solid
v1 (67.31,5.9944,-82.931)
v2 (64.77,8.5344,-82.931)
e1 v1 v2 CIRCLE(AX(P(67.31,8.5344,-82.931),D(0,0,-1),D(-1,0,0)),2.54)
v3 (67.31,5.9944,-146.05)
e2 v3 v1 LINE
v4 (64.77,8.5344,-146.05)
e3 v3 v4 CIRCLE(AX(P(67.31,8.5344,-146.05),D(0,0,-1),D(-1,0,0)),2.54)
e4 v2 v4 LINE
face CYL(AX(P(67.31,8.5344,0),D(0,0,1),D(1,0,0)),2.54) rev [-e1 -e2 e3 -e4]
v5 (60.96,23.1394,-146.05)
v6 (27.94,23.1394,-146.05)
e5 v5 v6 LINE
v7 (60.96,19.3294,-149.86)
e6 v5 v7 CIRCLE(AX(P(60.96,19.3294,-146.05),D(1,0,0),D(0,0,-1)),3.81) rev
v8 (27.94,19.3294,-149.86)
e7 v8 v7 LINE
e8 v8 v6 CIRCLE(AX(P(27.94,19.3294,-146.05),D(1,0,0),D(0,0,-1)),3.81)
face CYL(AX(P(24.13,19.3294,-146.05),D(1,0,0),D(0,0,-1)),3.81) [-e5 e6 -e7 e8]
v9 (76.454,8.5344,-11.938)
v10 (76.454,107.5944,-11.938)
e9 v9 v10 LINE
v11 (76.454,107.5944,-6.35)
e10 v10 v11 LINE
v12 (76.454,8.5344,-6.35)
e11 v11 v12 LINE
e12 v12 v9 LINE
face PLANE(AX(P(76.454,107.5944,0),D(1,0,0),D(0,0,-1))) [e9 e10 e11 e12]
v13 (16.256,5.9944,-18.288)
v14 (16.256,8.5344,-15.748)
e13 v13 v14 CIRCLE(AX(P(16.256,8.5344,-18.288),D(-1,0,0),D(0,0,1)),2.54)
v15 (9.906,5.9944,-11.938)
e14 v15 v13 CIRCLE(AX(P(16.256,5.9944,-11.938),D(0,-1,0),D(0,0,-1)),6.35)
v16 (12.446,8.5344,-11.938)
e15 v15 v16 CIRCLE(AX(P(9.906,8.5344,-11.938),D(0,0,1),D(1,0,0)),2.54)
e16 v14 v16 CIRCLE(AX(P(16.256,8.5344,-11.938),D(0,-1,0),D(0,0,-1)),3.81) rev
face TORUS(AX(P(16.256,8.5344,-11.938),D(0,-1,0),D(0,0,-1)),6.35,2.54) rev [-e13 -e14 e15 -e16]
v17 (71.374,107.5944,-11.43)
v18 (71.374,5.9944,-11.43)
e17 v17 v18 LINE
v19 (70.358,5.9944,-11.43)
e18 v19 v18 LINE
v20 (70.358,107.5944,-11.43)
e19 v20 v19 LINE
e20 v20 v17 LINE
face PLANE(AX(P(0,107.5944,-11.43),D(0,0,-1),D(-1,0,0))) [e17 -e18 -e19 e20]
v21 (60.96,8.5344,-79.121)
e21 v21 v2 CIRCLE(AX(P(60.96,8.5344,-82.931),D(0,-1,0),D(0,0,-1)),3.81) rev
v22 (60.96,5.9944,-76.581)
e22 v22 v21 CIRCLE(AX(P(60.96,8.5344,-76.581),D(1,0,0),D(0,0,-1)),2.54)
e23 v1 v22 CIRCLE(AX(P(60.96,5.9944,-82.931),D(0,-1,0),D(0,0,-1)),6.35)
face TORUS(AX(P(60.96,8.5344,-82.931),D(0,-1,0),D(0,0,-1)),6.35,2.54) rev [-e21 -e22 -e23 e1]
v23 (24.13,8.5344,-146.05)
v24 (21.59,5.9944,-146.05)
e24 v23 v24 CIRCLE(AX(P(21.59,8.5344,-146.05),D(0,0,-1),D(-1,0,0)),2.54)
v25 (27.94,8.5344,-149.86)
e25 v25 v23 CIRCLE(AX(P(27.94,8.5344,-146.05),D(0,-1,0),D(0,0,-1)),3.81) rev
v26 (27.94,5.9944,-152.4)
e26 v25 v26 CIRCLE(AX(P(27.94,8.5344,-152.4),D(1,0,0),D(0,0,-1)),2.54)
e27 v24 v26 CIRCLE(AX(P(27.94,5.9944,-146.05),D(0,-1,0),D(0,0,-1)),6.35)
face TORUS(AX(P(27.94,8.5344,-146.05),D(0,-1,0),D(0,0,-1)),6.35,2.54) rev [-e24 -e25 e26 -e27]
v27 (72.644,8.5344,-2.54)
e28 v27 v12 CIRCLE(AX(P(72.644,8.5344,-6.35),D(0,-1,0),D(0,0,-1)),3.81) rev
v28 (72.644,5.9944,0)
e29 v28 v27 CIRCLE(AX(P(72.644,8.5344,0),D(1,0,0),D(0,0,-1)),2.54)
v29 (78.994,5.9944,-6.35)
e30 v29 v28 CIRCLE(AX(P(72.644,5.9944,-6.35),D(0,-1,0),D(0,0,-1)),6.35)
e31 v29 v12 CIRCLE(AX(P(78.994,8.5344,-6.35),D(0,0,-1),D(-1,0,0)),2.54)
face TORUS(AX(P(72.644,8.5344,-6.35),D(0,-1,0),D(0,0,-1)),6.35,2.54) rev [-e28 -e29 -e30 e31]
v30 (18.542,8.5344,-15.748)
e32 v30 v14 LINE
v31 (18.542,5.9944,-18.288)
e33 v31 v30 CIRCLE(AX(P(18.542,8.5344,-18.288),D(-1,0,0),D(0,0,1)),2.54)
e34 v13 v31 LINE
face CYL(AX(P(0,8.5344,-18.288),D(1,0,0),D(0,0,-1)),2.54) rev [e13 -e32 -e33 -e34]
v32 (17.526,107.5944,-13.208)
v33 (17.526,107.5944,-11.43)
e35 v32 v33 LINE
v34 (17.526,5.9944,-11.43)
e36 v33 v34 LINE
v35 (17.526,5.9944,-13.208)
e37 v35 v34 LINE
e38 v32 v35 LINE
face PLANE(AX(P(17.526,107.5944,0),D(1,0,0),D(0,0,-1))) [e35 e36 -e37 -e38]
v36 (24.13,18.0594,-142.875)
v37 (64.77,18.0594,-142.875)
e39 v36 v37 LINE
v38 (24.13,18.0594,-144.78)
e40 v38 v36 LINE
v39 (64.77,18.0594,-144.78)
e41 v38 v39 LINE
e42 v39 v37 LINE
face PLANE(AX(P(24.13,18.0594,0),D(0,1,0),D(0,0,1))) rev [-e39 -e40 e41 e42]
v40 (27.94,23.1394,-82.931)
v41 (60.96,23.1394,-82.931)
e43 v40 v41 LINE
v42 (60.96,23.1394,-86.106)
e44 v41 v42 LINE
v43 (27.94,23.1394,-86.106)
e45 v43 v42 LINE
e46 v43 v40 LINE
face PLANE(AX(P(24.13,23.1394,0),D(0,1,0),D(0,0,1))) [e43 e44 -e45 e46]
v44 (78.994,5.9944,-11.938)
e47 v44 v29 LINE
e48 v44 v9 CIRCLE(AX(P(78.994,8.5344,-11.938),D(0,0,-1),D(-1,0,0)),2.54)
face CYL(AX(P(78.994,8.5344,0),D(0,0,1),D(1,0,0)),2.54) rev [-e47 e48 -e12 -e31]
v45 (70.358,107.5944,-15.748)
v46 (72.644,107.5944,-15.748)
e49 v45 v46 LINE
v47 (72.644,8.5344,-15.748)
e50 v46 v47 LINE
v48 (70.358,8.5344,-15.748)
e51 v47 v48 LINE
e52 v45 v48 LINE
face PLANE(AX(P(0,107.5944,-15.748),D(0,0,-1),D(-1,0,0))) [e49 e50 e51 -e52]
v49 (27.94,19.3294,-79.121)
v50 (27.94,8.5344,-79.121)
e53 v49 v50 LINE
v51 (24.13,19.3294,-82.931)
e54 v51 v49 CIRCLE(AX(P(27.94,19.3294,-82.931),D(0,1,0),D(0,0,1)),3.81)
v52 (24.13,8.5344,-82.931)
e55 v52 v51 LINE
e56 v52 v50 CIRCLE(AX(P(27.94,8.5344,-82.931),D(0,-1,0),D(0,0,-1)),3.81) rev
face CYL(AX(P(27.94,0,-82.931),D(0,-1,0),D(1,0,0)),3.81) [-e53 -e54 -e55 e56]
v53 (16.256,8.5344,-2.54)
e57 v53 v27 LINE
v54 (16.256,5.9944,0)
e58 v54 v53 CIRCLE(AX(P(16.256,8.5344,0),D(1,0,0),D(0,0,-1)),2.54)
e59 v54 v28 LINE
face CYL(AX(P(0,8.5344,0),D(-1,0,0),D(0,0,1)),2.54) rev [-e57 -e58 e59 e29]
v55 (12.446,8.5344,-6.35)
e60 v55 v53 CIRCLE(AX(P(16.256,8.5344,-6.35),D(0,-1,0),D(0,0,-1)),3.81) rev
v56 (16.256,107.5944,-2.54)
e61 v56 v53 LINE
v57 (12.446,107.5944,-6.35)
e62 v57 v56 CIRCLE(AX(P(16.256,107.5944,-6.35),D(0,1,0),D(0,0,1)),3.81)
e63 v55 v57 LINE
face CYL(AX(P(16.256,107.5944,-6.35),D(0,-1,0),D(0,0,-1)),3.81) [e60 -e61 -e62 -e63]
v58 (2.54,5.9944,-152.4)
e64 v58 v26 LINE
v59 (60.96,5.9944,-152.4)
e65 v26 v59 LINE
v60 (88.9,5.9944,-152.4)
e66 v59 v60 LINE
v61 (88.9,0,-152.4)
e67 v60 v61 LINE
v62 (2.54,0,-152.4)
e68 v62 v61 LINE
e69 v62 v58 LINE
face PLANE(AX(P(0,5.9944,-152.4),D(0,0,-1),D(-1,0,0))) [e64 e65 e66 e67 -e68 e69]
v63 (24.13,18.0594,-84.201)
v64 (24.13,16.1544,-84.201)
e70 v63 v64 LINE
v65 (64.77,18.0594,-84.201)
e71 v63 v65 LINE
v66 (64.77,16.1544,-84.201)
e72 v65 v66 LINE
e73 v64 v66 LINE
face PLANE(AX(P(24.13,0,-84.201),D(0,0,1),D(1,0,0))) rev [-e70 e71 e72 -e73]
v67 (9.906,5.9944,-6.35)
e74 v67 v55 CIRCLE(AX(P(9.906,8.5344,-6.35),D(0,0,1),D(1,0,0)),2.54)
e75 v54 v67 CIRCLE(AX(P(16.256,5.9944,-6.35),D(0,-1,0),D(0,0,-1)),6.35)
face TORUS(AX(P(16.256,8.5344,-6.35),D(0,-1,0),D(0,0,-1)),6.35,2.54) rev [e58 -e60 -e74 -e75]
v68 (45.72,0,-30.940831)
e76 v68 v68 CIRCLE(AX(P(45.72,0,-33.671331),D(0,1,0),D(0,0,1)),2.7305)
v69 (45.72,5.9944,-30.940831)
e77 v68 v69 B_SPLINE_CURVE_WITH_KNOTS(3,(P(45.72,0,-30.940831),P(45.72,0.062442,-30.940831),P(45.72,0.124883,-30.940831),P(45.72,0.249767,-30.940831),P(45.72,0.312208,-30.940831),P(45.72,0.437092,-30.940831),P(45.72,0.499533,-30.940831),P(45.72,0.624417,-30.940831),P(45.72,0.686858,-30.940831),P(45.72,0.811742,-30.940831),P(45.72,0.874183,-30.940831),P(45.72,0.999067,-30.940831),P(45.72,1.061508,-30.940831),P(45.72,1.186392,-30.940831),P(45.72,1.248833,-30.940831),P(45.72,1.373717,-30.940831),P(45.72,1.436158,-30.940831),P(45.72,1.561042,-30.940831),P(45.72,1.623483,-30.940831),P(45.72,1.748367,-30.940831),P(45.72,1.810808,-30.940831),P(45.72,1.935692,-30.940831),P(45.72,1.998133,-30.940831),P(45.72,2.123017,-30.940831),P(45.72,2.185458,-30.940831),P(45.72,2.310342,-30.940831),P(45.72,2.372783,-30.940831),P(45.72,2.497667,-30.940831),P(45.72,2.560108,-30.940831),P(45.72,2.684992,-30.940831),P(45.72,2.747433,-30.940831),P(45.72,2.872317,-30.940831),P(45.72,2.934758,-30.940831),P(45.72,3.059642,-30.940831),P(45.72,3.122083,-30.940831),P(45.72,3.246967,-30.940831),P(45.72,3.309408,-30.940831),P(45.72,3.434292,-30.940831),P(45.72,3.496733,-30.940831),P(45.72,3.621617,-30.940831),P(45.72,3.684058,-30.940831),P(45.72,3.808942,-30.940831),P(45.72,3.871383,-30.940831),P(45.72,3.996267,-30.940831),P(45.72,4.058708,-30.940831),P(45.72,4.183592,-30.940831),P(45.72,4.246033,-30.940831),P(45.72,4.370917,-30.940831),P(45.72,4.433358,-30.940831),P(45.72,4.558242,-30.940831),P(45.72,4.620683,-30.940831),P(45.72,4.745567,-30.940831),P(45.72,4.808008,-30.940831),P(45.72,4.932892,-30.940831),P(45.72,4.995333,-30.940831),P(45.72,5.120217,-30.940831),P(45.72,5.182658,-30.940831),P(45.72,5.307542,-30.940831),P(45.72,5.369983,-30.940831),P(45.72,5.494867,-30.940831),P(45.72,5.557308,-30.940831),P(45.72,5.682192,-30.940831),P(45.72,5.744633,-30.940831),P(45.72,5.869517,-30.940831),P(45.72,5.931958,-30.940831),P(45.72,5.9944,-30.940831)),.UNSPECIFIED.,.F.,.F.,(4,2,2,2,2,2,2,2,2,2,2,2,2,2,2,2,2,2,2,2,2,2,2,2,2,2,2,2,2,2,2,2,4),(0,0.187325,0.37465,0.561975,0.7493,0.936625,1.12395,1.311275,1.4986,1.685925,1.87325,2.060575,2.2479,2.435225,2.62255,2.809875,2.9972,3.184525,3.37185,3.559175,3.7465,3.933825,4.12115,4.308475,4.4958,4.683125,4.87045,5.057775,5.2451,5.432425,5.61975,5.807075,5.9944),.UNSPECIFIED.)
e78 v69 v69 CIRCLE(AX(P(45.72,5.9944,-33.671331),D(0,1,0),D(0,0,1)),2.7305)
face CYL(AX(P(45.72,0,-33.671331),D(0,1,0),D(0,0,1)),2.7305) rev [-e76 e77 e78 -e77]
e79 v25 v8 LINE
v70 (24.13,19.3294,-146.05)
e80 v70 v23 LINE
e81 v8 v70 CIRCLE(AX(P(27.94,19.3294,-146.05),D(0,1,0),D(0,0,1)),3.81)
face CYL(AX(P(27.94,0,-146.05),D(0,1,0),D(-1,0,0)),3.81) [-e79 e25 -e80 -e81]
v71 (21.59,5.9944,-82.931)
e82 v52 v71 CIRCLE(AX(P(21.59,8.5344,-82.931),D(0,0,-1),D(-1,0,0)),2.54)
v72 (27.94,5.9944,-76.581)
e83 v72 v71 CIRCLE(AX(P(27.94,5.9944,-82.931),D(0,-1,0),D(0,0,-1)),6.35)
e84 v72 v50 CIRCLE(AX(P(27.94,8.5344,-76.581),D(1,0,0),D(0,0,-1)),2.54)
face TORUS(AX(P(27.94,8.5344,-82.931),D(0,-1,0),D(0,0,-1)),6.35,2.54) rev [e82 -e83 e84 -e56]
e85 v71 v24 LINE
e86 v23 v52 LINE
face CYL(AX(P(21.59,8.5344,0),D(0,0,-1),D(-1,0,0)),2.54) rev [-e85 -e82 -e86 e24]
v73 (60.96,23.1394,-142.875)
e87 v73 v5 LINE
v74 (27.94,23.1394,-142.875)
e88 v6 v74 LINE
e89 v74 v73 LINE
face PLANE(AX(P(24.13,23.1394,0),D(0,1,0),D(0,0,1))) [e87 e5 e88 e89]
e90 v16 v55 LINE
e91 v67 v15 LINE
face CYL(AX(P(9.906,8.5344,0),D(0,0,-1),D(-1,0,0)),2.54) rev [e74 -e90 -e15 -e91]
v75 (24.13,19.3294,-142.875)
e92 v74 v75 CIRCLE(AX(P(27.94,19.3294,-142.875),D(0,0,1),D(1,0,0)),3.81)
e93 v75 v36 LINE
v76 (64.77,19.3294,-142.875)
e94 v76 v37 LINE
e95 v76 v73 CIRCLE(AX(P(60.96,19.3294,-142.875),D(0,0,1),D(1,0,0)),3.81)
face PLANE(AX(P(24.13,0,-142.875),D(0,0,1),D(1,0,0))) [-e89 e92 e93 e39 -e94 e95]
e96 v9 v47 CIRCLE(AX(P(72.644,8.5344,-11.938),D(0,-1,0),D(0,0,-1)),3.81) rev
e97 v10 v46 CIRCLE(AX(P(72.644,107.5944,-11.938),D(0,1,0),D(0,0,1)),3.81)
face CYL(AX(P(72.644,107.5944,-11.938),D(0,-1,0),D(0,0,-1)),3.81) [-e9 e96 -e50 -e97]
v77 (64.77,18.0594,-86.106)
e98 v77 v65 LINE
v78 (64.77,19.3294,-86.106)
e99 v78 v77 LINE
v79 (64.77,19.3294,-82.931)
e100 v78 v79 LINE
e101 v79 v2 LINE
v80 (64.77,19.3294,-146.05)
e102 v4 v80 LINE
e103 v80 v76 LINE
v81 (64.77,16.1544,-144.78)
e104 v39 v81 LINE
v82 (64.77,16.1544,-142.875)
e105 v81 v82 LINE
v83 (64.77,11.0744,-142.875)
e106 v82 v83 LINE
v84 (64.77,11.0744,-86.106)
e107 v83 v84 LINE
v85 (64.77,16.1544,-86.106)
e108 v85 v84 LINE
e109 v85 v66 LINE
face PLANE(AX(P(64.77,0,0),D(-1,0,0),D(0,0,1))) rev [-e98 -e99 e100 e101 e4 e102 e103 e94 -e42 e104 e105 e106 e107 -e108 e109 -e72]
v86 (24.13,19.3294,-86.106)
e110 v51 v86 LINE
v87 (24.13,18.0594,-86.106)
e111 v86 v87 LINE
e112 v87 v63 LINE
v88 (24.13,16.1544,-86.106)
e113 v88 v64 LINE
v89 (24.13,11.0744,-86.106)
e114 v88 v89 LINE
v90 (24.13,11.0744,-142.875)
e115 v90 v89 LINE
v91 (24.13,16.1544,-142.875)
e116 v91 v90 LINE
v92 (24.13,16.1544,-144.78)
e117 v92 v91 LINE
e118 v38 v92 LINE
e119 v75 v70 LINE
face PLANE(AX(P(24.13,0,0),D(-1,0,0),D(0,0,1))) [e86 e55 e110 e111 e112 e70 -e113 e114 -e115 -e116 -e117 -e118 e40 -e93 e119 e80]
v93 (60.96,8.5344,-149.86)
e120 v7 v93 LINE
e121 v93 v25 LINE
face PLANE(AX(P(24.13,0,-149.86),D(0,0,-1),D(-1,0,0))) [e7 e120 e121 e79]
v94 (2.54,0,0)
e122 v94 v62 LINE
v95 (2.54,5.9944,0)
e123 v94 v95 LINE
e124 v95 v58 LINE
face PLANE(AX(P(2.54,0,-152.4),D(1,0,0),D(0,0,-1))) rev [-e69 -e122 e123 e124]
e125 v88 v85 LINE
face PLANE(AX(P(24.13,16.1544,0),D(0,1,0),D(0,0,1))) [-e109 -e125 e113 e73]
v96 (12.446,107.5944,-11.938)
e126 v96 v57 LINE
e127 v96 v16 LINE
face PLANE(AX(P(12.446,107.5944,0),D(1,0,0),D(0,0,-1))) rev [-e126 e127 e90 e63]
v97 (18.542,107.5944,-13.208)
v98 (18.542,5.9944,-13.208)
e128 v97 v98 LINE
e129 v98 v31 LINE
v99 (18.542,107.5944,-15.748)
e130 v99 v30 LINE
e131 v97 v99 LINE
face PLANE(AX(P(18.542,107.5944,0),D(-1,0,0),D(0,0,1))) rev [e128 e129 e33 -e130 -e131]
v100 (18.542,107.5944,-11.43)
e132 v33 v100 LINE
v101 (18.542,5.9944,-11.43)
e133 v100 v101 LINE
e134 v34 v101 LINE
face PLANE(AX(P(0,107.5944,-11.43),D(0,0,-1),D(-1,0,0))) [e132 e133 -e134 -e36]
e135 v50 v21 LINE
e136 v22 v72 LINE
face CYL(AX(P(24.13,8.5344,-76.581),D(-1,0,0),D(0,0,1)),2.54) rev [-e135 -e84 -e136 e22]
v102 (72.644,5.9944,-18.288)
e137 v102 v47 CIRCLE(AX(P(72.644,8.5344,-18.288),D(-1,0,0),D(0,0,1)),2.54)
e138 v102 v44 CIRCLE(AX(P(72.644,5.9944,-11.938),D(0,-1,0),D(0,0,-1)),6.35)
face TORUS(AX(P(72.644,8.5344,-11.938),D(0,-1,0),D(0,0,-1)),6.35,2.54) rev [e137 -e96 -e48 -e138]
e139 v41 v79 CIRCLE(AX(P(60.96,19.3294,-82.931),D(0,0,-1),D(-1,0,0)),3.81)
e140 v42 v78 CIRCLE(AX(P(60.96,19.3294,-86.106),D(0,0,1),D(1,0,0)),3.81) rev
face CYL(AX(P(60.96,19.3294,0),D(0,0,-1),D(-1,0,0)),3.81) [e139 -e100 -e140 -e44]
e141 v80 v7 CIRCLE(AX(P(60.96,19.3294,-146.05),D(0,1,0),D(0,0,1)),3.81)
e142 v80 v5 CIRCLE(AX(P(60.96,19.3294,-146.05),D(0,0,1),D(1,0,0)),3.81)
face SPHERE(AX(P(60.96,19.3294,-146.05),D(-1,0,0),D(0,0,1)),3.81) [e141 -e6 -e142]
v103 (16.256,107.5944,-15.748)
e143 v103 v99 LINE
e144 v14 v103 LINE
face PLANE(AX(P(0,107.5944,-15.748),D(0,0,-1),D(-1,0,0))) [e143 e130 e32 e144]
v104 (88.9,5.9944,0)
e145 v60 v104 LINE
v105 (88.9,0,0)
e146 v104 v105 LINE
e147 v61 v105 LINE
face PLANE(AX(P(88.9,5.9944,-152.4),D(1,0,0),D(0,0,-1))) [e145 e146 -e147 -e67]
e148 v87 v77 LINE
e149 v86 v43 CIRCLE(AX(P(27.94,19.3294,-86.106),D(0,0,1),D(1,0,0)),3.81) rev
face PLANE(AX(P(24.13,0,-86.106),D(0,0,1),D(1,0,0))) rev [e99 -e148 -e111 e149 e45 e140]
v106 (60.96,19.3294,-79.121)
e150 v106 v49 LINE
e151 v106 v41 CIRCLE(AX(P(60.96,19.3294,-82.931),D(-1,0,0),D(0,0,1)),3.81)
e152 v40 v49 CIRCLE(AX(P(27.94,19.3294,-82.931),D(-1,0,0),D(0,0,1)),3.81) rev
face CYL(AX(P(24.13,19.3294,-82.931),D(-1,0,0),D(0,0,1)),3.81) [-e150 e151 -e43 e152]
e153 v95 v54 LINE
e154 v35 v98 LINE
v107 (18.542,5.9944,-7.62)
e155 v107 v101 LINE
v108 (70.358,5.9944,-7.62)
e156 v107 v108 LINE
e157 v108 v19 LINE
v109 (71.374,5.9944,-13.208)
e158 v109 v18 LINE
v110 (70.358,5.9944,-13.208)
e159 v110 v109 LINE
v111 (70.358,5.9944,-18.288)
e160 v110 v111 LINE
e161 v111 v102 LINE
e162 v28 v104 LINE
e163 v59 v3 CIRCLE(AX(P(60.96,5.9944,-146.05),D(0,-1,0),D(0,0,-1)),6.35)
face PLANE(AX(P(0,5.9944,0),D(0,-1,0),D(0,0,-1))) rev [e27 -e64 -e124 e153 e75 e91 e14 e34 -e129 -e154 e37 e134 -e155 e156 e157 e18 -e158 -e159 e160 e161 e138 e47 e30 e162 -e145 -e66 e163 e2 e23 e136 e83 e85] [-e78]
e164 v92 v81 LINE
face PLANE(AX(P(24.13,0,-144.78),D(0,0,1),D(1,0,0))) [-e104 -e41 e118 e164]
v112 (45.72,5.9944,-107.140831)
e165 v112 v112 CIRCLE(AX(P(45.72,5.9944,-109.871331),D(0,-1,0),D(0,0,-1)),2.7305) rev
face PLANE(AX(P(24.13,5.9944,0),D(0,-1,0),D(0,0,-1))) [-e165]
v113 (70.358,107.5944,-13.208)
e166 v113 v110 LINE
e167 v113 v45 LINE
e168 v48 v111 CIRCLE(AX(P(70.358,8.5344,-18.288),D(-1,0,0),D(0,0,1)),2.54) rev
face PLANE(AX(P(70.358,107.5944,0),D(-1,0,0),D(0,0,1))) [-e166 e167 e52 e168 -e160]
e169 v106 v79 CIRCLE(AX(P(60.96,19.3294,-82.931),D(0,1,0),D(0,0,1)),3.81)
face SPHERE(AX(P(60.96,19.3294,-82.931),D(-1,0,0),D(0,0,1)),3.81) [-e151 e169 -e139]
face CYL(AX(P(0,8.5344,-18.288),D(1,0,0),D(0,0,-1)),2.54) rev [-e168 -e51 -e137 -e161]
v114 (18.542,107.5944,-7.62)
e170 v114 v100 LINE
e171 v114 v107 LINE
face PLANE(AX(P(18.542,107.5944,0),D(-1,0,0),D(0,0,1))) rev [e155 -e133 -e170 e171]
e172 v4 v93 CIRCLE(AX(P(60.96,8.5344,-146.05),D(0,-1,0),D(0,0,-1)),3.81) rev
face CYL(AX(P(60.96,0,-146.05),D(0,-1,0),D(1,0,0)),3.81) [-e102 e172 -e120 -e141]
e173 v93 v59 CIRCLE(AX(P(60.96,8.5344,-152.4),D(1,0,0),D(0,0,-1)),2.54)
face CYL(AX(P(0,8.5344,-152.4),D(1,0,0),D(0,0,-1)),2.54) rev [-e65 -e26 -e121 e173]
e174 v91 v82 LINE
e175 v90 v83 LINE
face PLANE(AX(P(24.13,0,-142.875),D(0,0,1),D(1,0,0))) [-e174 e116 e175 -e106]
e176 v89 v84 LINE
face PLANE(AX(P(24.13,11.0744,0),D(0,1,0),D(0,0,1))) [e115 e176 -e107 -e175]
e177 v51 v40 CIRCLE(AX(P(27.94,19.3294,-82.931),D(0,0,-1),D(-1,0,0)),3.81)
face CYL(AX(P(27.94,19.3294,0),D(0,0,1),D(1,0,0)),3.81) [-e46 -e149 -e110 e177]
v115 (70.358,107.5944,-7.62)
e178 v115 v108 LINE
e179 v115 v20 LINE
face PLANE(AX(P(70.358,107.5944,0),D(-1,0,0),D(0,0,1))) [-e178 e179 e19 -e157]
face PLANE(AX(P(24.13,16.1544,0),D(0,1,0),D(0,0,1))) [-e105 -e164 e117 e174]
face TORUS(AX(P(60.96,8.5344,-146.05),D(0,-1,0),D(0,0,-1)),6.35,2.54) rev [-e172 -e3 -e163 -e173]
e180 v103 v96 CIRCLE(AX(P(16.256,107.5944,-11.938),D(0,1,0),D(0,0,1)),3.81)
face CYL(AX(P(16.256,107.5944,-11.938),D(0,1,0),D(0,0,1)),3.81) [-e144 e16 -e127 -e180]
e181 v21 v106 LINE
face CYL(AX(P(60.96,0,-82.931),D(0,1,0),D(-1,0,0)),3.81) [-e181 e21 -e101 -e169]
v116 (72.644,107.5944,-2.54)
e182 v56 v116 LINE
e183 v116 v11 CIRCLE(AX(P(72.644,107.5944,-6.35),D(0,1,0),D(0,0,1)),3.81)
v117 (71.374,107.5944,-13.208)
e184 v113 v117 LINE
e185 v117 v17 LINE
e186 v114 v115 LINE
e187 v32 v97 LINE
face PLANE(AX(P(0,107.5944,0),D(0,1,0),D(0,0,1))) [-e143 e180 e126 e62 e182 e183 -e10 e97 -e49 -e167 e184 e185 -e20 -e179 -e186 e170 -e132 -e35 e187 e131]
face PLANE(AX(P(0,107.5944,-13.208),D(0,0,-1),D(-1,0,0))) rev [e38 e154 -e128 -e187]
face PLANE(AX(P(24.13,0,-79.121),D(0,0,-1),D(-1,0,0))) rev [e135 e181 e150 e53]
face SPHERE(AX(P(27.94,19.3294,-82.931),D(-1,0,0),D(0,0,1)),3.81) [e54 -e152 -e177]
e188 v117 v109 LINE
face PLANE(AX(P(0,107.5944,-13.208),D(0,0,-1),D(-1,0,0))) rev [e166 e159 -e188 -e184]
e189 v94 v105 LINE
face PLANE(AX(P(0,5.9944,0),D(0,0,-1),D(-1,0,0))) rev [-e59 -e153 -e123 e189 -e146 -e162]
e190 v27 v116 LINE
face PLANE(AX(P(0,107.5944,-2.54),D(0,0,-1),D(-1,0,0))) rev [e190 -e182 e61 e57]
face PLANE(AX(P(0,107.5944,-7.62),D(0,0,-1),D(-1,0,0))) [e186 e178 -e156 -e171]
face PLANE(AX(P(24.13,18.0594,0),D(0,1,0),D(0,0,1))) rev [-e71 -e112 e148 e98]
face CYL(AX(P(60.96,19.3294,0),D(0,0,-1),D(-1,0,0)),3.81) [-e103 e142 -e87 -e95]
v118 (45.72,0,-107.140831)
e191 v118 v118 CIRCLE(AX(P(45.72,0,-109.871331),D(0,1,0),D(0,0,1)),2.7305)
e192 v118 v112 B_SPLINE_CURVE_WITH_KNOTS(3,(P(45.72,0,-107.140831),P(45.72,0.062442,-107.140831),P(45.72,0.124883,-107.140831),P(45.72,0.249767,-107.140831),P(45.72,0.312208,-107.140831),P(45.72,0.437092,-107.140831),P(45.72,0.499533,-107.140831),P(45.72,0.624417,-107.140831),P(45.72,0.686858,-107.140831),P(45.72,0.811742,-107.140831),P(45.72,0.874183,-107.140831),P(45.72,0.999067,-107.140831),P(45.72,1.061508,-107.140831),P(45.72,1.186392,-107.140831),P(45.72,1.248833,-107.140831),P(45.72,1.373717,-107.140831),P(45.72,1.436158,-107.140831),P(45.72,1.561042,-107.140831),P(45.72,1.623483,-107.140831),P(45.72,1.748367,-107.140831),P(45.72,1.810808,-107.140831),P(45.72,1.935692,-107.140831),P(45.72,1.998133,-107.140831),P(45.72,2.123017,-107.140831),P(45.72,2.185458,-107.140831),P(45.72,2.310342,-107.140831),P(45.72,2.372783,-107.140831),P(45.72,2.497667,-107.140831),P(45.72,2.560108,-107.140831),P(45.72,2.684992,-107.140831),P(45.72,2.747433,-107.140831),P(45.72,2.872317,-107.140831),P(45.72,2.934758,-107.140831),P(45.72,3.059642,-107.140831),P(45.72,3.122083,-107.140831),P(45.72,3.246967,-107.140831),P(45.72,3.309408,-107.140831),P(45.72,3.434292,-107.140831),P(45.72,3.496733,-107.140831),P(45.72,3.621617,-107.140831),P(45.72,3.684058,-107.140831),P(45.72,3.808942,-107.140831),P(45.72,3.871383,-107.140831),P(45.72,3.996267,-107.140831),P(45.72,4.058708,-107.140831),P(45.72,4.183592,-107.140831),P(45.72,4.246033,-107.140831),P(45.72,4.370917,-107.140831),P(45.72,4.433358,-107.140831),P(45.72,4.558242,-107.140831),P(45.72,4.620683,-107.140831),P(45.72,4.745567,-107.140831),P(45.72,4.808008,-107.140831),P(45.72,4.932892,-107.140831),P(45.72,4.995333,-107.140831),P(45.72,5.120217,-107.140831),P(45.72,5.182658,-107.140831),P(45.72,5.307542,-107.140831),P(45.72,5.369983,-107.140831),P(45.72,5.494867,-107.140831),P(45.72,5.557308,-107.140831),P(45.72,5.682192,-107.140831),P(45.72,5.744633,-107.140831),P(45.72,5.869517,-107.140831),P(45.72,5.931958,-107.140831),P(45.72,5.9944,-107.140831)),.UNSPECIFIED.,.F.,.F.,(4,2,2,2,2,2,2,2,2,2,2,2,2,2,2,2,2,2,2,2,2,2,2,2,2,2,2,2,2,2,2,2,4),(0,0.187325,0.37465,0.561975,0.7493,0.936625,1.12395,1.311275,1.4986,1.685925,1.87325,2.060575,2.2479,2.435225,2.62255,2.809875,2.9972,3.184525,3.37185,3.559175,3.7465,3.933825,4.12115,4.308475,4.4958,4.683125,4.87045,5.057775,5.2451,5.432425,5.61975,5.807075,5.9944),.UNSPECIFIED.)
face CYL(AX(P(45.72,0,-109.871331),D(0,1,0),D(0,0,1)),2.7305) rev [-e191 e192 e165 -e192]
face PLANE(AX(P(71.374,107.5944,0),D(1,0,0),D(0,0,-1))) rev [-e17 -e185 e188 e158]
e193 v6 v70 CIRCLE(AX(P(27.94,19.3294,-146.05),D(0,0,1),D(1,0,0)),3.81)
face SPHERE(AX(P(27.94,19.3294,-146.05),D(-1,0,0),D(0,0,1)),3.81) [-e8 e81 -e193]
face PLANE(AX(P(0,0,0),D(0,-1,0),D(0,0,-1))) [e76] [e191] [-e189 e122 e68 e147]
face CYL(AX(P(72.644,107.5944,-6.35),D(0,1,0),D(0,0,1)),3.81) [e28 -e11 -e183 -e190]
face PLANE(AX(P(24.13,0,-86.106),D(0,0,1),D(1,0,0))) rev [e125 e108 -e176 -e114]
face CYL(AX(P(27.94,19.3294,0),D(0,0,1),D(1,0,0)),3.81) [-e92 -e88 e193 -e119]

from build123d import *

# Parameters (mm, degrees)
SKETCH2_W               = 88.9
SKETCH2_H               = 152.4
BOSS_EXTRUDE1_DEPTH     = 5.9944
CUT_EXTRUDE2_DEPTH      = 177.535840076
CUT_EXTRUDE2_DEPTH_BACK = 177.535840076
SKETCH4_R               = 2.7305
BOSS_EXTRUDE2_DEPTH     = 101.6
FILLET1_R               = 3.81
FILLET2_R               = 2.54
BOSS_EXTRUDE3_DEPTH     = 20.32
FILLET3_R               = 3.81
FILLET6_R               = 3.81
FILLET7_R               = 2.54
CUT_EXTRUDE3_DEPTH      = 204.596488182
CUT_EXTRUDE3_DEPTH_BACK = 204.596488182
SKETCH7_W               = 2.54
SKETCH7_H               = 152.4


with BuildPart() as part:
    # Sketch2 → Boss-Extrude1 (new body)
    with BuildSketch(Plane(origin=(0, 0, 0), x_dir=(1, 0, 0), z_dir=(0, 1, 0))):
        with Locations((44.45, 76.2)):
            Rectangle(SKETCH2_W, SKETCH2_H)
    extrude(amount=BOSS_EXTRUDE1_DEPTH)

    # Sketch4 → Cut-Extrude2 (cut, two sides: drawn at the far end of the back side and taken through both)
    with BuildSketch(Plane(origin=(0, 5.9944, 0), x_dir=(1, 0, 0), z_dir=(0, 1, 0)).offset(-CUT_EXTRUDE2_DEPTH_BACK)):
        with Locations(Location((45.72, 109.871331367, 0), (0, 0, 270))):
            Circle(SKETCH4_R)
        with Locations(Location((45.72, 33.671331367, 0), (0, 0, 270))):
            Circle(SKETCH4_R)
    extrude(amount=CUT_EXTRUDE2_DEPTH + CUT_EXTRUDE2_DEPTH_BACK, mode=Mode.SUBTRACT)

    # Sketch5 → Boss-Extrude2 (add)
    with BuildSketch(Plane(origin=(0, 5.9944, 0), x_dir=(1, 0, 0), z_dir=(0, 1, 0))):
        Polygon((18.542, 15.748), (12.446, 15.748), (12.446, 2.54), (76.454, 2.54), (76.454, 15.748), (70.358, 15.748), (70.358, 13.208), (71.374, 13.208), (71.374, 11.43), (70.358, 11.43), (70.358, 7.62), (18.542, 7.62), (18.542, 11.43), (17.526, 11.43), (17.526, 13.208), (18.542, 13.208), align=None)
    extrude(amount=BOSS_EXTRUDE2_DEPTH)

    # Fillet1
    fillet1_edges = [part.edges().sort_by_distance(p)[0] for p in [
        (12.446, 56.7944, -15.748),
        (12.446, 56.7944, -2.54),
        (76.454, 56.7944, -2.54),
        (76.454, 56.7944, -15.748),
    ]]
    fillet(fillet1_edges, radius=FILLET1_R)

    # Fillet2
    fillet2_edges = [part.edges().sort_by_distance(p)[0] for p in [
        (71.501, 5.9944, -15.748),
        (44.45, 5.9944, -2.54),
        (12.446, 5.9944, -9.144),
        (17.399, 5.9944, -15.748),
        (76.454, 5.9944, -9.144),
        (13.561923164, 5.9944, -3.655923164),
        (13.561923164, 5.9944, -14.632076836),
        (75.338076836, 5.9944, -3.655923164),
        (75.338076836, 5.9944, -14.632076836),
    ]]
    fillet(fillet2_edges, radius=FILLET2_R - 0.0001)  # a hair under: the kernel refuses the full size

    # Sketch6 → Boss-Extrude3 (add, symmetric)
    with BuildSketch(Plane.ZY.offset(-44.45)):
        Polygon((-149.86, 5.9944), (-79.121, 5.9944), (-79.121, 23.1394), (-86.106, 23.1394), (-86.106, 18.0594), (-84.201, 18.0594), (-84.201, 16.1544), (-86.106, 16.1544), (-86.106, 11.0744), (-142.875, 11.0744), (-142.875, 16.1544), (-144.78, 16.1544), (-144.78, 18.0594), (-142.875, 18.0594), (-142.875, 23.1394), (-149.86, 23.1394), align=None)
    extrude(amount=BOSS_EXTRUDE3_DEPTH, both=True)

    # Fillet3
    fillet3_edges = [part.edges().sort_by_distance(p)[0] for p in [
        (44.45, 23.1394, -149.86),
        (44.45, 23.1394, -79.121),
    ]]
    fillet(fillet3_edges, radius=FILLET3_R)

    # Fillet6
    fillet6_edges = [part.edges().sort_by_distance(p)[0] for p in [
        (24.13, 12.6619, -149.86),
        (64.77, 12.6619, -79.121),
        (24.13, 23.1394, -84.5185),
        (24.13, 12.6619, -79.121),
        (64.77, 23.1394, -84.5185),
        (64.77, 12.6619, -149.86),
        (64.77, 23.1394, -144.4625),
        (64.77, 22.023476836, -148.744076836),
        (64.77, 22.023476836, -80.236923164),
        (24.13, 23.1394, -144.4625),
        (24.13, 22.023476836, -148.744076836),
        (24.13, 22.023476836, -80.236923164),
    ]]
    fillet(fillet6_edges, radius=FILLET6_R)

    # Fillet7
    fillet7_edges = [part.edges().sort_by_distance(p)[0] for p in [
        (24.13, 5.9944, -114.4905),
        (64.77, 5.9944, -114.4905),
        (44.45, 5.9944, -79.121),
        (44.45, 5.9944, -149.86),
        (25.245923164, 5.9944, -80.236923164),
        (63.654076836, 5.9944, -80.236923164),
        (63.654076836, 5.9944, -148.744076836),
        (25.245923164, 5.9944, -148.744076836),
    ]]
    fillet(fillet7_edges, radius=FILLET7_R - 0.0001)  # a hair under: the kernel refuses the full size

    # Sketch7 → Cut-Extrude3 (cut, two sides: drawn at the far end of the back side and taken through both)
    with BuildSketch(Plane(origin=(0, 5.9944, 0), x_dir=(1, 0, 0), z_dir=(0, 1, 0)).offset(-CUT_EXTRUDE3_DEPTH_BACK)):
        with Locations((1.27, 76.2)):
            Rectangle(SKETCH7_W, SKETCH7_H)
    extrude(amount=CUT_EXTRUDE3_DEPTH + CUT_EXTRUDE3_DEPTH_BACK, mode=Mode.SUBTRACT)


solid = part.part
